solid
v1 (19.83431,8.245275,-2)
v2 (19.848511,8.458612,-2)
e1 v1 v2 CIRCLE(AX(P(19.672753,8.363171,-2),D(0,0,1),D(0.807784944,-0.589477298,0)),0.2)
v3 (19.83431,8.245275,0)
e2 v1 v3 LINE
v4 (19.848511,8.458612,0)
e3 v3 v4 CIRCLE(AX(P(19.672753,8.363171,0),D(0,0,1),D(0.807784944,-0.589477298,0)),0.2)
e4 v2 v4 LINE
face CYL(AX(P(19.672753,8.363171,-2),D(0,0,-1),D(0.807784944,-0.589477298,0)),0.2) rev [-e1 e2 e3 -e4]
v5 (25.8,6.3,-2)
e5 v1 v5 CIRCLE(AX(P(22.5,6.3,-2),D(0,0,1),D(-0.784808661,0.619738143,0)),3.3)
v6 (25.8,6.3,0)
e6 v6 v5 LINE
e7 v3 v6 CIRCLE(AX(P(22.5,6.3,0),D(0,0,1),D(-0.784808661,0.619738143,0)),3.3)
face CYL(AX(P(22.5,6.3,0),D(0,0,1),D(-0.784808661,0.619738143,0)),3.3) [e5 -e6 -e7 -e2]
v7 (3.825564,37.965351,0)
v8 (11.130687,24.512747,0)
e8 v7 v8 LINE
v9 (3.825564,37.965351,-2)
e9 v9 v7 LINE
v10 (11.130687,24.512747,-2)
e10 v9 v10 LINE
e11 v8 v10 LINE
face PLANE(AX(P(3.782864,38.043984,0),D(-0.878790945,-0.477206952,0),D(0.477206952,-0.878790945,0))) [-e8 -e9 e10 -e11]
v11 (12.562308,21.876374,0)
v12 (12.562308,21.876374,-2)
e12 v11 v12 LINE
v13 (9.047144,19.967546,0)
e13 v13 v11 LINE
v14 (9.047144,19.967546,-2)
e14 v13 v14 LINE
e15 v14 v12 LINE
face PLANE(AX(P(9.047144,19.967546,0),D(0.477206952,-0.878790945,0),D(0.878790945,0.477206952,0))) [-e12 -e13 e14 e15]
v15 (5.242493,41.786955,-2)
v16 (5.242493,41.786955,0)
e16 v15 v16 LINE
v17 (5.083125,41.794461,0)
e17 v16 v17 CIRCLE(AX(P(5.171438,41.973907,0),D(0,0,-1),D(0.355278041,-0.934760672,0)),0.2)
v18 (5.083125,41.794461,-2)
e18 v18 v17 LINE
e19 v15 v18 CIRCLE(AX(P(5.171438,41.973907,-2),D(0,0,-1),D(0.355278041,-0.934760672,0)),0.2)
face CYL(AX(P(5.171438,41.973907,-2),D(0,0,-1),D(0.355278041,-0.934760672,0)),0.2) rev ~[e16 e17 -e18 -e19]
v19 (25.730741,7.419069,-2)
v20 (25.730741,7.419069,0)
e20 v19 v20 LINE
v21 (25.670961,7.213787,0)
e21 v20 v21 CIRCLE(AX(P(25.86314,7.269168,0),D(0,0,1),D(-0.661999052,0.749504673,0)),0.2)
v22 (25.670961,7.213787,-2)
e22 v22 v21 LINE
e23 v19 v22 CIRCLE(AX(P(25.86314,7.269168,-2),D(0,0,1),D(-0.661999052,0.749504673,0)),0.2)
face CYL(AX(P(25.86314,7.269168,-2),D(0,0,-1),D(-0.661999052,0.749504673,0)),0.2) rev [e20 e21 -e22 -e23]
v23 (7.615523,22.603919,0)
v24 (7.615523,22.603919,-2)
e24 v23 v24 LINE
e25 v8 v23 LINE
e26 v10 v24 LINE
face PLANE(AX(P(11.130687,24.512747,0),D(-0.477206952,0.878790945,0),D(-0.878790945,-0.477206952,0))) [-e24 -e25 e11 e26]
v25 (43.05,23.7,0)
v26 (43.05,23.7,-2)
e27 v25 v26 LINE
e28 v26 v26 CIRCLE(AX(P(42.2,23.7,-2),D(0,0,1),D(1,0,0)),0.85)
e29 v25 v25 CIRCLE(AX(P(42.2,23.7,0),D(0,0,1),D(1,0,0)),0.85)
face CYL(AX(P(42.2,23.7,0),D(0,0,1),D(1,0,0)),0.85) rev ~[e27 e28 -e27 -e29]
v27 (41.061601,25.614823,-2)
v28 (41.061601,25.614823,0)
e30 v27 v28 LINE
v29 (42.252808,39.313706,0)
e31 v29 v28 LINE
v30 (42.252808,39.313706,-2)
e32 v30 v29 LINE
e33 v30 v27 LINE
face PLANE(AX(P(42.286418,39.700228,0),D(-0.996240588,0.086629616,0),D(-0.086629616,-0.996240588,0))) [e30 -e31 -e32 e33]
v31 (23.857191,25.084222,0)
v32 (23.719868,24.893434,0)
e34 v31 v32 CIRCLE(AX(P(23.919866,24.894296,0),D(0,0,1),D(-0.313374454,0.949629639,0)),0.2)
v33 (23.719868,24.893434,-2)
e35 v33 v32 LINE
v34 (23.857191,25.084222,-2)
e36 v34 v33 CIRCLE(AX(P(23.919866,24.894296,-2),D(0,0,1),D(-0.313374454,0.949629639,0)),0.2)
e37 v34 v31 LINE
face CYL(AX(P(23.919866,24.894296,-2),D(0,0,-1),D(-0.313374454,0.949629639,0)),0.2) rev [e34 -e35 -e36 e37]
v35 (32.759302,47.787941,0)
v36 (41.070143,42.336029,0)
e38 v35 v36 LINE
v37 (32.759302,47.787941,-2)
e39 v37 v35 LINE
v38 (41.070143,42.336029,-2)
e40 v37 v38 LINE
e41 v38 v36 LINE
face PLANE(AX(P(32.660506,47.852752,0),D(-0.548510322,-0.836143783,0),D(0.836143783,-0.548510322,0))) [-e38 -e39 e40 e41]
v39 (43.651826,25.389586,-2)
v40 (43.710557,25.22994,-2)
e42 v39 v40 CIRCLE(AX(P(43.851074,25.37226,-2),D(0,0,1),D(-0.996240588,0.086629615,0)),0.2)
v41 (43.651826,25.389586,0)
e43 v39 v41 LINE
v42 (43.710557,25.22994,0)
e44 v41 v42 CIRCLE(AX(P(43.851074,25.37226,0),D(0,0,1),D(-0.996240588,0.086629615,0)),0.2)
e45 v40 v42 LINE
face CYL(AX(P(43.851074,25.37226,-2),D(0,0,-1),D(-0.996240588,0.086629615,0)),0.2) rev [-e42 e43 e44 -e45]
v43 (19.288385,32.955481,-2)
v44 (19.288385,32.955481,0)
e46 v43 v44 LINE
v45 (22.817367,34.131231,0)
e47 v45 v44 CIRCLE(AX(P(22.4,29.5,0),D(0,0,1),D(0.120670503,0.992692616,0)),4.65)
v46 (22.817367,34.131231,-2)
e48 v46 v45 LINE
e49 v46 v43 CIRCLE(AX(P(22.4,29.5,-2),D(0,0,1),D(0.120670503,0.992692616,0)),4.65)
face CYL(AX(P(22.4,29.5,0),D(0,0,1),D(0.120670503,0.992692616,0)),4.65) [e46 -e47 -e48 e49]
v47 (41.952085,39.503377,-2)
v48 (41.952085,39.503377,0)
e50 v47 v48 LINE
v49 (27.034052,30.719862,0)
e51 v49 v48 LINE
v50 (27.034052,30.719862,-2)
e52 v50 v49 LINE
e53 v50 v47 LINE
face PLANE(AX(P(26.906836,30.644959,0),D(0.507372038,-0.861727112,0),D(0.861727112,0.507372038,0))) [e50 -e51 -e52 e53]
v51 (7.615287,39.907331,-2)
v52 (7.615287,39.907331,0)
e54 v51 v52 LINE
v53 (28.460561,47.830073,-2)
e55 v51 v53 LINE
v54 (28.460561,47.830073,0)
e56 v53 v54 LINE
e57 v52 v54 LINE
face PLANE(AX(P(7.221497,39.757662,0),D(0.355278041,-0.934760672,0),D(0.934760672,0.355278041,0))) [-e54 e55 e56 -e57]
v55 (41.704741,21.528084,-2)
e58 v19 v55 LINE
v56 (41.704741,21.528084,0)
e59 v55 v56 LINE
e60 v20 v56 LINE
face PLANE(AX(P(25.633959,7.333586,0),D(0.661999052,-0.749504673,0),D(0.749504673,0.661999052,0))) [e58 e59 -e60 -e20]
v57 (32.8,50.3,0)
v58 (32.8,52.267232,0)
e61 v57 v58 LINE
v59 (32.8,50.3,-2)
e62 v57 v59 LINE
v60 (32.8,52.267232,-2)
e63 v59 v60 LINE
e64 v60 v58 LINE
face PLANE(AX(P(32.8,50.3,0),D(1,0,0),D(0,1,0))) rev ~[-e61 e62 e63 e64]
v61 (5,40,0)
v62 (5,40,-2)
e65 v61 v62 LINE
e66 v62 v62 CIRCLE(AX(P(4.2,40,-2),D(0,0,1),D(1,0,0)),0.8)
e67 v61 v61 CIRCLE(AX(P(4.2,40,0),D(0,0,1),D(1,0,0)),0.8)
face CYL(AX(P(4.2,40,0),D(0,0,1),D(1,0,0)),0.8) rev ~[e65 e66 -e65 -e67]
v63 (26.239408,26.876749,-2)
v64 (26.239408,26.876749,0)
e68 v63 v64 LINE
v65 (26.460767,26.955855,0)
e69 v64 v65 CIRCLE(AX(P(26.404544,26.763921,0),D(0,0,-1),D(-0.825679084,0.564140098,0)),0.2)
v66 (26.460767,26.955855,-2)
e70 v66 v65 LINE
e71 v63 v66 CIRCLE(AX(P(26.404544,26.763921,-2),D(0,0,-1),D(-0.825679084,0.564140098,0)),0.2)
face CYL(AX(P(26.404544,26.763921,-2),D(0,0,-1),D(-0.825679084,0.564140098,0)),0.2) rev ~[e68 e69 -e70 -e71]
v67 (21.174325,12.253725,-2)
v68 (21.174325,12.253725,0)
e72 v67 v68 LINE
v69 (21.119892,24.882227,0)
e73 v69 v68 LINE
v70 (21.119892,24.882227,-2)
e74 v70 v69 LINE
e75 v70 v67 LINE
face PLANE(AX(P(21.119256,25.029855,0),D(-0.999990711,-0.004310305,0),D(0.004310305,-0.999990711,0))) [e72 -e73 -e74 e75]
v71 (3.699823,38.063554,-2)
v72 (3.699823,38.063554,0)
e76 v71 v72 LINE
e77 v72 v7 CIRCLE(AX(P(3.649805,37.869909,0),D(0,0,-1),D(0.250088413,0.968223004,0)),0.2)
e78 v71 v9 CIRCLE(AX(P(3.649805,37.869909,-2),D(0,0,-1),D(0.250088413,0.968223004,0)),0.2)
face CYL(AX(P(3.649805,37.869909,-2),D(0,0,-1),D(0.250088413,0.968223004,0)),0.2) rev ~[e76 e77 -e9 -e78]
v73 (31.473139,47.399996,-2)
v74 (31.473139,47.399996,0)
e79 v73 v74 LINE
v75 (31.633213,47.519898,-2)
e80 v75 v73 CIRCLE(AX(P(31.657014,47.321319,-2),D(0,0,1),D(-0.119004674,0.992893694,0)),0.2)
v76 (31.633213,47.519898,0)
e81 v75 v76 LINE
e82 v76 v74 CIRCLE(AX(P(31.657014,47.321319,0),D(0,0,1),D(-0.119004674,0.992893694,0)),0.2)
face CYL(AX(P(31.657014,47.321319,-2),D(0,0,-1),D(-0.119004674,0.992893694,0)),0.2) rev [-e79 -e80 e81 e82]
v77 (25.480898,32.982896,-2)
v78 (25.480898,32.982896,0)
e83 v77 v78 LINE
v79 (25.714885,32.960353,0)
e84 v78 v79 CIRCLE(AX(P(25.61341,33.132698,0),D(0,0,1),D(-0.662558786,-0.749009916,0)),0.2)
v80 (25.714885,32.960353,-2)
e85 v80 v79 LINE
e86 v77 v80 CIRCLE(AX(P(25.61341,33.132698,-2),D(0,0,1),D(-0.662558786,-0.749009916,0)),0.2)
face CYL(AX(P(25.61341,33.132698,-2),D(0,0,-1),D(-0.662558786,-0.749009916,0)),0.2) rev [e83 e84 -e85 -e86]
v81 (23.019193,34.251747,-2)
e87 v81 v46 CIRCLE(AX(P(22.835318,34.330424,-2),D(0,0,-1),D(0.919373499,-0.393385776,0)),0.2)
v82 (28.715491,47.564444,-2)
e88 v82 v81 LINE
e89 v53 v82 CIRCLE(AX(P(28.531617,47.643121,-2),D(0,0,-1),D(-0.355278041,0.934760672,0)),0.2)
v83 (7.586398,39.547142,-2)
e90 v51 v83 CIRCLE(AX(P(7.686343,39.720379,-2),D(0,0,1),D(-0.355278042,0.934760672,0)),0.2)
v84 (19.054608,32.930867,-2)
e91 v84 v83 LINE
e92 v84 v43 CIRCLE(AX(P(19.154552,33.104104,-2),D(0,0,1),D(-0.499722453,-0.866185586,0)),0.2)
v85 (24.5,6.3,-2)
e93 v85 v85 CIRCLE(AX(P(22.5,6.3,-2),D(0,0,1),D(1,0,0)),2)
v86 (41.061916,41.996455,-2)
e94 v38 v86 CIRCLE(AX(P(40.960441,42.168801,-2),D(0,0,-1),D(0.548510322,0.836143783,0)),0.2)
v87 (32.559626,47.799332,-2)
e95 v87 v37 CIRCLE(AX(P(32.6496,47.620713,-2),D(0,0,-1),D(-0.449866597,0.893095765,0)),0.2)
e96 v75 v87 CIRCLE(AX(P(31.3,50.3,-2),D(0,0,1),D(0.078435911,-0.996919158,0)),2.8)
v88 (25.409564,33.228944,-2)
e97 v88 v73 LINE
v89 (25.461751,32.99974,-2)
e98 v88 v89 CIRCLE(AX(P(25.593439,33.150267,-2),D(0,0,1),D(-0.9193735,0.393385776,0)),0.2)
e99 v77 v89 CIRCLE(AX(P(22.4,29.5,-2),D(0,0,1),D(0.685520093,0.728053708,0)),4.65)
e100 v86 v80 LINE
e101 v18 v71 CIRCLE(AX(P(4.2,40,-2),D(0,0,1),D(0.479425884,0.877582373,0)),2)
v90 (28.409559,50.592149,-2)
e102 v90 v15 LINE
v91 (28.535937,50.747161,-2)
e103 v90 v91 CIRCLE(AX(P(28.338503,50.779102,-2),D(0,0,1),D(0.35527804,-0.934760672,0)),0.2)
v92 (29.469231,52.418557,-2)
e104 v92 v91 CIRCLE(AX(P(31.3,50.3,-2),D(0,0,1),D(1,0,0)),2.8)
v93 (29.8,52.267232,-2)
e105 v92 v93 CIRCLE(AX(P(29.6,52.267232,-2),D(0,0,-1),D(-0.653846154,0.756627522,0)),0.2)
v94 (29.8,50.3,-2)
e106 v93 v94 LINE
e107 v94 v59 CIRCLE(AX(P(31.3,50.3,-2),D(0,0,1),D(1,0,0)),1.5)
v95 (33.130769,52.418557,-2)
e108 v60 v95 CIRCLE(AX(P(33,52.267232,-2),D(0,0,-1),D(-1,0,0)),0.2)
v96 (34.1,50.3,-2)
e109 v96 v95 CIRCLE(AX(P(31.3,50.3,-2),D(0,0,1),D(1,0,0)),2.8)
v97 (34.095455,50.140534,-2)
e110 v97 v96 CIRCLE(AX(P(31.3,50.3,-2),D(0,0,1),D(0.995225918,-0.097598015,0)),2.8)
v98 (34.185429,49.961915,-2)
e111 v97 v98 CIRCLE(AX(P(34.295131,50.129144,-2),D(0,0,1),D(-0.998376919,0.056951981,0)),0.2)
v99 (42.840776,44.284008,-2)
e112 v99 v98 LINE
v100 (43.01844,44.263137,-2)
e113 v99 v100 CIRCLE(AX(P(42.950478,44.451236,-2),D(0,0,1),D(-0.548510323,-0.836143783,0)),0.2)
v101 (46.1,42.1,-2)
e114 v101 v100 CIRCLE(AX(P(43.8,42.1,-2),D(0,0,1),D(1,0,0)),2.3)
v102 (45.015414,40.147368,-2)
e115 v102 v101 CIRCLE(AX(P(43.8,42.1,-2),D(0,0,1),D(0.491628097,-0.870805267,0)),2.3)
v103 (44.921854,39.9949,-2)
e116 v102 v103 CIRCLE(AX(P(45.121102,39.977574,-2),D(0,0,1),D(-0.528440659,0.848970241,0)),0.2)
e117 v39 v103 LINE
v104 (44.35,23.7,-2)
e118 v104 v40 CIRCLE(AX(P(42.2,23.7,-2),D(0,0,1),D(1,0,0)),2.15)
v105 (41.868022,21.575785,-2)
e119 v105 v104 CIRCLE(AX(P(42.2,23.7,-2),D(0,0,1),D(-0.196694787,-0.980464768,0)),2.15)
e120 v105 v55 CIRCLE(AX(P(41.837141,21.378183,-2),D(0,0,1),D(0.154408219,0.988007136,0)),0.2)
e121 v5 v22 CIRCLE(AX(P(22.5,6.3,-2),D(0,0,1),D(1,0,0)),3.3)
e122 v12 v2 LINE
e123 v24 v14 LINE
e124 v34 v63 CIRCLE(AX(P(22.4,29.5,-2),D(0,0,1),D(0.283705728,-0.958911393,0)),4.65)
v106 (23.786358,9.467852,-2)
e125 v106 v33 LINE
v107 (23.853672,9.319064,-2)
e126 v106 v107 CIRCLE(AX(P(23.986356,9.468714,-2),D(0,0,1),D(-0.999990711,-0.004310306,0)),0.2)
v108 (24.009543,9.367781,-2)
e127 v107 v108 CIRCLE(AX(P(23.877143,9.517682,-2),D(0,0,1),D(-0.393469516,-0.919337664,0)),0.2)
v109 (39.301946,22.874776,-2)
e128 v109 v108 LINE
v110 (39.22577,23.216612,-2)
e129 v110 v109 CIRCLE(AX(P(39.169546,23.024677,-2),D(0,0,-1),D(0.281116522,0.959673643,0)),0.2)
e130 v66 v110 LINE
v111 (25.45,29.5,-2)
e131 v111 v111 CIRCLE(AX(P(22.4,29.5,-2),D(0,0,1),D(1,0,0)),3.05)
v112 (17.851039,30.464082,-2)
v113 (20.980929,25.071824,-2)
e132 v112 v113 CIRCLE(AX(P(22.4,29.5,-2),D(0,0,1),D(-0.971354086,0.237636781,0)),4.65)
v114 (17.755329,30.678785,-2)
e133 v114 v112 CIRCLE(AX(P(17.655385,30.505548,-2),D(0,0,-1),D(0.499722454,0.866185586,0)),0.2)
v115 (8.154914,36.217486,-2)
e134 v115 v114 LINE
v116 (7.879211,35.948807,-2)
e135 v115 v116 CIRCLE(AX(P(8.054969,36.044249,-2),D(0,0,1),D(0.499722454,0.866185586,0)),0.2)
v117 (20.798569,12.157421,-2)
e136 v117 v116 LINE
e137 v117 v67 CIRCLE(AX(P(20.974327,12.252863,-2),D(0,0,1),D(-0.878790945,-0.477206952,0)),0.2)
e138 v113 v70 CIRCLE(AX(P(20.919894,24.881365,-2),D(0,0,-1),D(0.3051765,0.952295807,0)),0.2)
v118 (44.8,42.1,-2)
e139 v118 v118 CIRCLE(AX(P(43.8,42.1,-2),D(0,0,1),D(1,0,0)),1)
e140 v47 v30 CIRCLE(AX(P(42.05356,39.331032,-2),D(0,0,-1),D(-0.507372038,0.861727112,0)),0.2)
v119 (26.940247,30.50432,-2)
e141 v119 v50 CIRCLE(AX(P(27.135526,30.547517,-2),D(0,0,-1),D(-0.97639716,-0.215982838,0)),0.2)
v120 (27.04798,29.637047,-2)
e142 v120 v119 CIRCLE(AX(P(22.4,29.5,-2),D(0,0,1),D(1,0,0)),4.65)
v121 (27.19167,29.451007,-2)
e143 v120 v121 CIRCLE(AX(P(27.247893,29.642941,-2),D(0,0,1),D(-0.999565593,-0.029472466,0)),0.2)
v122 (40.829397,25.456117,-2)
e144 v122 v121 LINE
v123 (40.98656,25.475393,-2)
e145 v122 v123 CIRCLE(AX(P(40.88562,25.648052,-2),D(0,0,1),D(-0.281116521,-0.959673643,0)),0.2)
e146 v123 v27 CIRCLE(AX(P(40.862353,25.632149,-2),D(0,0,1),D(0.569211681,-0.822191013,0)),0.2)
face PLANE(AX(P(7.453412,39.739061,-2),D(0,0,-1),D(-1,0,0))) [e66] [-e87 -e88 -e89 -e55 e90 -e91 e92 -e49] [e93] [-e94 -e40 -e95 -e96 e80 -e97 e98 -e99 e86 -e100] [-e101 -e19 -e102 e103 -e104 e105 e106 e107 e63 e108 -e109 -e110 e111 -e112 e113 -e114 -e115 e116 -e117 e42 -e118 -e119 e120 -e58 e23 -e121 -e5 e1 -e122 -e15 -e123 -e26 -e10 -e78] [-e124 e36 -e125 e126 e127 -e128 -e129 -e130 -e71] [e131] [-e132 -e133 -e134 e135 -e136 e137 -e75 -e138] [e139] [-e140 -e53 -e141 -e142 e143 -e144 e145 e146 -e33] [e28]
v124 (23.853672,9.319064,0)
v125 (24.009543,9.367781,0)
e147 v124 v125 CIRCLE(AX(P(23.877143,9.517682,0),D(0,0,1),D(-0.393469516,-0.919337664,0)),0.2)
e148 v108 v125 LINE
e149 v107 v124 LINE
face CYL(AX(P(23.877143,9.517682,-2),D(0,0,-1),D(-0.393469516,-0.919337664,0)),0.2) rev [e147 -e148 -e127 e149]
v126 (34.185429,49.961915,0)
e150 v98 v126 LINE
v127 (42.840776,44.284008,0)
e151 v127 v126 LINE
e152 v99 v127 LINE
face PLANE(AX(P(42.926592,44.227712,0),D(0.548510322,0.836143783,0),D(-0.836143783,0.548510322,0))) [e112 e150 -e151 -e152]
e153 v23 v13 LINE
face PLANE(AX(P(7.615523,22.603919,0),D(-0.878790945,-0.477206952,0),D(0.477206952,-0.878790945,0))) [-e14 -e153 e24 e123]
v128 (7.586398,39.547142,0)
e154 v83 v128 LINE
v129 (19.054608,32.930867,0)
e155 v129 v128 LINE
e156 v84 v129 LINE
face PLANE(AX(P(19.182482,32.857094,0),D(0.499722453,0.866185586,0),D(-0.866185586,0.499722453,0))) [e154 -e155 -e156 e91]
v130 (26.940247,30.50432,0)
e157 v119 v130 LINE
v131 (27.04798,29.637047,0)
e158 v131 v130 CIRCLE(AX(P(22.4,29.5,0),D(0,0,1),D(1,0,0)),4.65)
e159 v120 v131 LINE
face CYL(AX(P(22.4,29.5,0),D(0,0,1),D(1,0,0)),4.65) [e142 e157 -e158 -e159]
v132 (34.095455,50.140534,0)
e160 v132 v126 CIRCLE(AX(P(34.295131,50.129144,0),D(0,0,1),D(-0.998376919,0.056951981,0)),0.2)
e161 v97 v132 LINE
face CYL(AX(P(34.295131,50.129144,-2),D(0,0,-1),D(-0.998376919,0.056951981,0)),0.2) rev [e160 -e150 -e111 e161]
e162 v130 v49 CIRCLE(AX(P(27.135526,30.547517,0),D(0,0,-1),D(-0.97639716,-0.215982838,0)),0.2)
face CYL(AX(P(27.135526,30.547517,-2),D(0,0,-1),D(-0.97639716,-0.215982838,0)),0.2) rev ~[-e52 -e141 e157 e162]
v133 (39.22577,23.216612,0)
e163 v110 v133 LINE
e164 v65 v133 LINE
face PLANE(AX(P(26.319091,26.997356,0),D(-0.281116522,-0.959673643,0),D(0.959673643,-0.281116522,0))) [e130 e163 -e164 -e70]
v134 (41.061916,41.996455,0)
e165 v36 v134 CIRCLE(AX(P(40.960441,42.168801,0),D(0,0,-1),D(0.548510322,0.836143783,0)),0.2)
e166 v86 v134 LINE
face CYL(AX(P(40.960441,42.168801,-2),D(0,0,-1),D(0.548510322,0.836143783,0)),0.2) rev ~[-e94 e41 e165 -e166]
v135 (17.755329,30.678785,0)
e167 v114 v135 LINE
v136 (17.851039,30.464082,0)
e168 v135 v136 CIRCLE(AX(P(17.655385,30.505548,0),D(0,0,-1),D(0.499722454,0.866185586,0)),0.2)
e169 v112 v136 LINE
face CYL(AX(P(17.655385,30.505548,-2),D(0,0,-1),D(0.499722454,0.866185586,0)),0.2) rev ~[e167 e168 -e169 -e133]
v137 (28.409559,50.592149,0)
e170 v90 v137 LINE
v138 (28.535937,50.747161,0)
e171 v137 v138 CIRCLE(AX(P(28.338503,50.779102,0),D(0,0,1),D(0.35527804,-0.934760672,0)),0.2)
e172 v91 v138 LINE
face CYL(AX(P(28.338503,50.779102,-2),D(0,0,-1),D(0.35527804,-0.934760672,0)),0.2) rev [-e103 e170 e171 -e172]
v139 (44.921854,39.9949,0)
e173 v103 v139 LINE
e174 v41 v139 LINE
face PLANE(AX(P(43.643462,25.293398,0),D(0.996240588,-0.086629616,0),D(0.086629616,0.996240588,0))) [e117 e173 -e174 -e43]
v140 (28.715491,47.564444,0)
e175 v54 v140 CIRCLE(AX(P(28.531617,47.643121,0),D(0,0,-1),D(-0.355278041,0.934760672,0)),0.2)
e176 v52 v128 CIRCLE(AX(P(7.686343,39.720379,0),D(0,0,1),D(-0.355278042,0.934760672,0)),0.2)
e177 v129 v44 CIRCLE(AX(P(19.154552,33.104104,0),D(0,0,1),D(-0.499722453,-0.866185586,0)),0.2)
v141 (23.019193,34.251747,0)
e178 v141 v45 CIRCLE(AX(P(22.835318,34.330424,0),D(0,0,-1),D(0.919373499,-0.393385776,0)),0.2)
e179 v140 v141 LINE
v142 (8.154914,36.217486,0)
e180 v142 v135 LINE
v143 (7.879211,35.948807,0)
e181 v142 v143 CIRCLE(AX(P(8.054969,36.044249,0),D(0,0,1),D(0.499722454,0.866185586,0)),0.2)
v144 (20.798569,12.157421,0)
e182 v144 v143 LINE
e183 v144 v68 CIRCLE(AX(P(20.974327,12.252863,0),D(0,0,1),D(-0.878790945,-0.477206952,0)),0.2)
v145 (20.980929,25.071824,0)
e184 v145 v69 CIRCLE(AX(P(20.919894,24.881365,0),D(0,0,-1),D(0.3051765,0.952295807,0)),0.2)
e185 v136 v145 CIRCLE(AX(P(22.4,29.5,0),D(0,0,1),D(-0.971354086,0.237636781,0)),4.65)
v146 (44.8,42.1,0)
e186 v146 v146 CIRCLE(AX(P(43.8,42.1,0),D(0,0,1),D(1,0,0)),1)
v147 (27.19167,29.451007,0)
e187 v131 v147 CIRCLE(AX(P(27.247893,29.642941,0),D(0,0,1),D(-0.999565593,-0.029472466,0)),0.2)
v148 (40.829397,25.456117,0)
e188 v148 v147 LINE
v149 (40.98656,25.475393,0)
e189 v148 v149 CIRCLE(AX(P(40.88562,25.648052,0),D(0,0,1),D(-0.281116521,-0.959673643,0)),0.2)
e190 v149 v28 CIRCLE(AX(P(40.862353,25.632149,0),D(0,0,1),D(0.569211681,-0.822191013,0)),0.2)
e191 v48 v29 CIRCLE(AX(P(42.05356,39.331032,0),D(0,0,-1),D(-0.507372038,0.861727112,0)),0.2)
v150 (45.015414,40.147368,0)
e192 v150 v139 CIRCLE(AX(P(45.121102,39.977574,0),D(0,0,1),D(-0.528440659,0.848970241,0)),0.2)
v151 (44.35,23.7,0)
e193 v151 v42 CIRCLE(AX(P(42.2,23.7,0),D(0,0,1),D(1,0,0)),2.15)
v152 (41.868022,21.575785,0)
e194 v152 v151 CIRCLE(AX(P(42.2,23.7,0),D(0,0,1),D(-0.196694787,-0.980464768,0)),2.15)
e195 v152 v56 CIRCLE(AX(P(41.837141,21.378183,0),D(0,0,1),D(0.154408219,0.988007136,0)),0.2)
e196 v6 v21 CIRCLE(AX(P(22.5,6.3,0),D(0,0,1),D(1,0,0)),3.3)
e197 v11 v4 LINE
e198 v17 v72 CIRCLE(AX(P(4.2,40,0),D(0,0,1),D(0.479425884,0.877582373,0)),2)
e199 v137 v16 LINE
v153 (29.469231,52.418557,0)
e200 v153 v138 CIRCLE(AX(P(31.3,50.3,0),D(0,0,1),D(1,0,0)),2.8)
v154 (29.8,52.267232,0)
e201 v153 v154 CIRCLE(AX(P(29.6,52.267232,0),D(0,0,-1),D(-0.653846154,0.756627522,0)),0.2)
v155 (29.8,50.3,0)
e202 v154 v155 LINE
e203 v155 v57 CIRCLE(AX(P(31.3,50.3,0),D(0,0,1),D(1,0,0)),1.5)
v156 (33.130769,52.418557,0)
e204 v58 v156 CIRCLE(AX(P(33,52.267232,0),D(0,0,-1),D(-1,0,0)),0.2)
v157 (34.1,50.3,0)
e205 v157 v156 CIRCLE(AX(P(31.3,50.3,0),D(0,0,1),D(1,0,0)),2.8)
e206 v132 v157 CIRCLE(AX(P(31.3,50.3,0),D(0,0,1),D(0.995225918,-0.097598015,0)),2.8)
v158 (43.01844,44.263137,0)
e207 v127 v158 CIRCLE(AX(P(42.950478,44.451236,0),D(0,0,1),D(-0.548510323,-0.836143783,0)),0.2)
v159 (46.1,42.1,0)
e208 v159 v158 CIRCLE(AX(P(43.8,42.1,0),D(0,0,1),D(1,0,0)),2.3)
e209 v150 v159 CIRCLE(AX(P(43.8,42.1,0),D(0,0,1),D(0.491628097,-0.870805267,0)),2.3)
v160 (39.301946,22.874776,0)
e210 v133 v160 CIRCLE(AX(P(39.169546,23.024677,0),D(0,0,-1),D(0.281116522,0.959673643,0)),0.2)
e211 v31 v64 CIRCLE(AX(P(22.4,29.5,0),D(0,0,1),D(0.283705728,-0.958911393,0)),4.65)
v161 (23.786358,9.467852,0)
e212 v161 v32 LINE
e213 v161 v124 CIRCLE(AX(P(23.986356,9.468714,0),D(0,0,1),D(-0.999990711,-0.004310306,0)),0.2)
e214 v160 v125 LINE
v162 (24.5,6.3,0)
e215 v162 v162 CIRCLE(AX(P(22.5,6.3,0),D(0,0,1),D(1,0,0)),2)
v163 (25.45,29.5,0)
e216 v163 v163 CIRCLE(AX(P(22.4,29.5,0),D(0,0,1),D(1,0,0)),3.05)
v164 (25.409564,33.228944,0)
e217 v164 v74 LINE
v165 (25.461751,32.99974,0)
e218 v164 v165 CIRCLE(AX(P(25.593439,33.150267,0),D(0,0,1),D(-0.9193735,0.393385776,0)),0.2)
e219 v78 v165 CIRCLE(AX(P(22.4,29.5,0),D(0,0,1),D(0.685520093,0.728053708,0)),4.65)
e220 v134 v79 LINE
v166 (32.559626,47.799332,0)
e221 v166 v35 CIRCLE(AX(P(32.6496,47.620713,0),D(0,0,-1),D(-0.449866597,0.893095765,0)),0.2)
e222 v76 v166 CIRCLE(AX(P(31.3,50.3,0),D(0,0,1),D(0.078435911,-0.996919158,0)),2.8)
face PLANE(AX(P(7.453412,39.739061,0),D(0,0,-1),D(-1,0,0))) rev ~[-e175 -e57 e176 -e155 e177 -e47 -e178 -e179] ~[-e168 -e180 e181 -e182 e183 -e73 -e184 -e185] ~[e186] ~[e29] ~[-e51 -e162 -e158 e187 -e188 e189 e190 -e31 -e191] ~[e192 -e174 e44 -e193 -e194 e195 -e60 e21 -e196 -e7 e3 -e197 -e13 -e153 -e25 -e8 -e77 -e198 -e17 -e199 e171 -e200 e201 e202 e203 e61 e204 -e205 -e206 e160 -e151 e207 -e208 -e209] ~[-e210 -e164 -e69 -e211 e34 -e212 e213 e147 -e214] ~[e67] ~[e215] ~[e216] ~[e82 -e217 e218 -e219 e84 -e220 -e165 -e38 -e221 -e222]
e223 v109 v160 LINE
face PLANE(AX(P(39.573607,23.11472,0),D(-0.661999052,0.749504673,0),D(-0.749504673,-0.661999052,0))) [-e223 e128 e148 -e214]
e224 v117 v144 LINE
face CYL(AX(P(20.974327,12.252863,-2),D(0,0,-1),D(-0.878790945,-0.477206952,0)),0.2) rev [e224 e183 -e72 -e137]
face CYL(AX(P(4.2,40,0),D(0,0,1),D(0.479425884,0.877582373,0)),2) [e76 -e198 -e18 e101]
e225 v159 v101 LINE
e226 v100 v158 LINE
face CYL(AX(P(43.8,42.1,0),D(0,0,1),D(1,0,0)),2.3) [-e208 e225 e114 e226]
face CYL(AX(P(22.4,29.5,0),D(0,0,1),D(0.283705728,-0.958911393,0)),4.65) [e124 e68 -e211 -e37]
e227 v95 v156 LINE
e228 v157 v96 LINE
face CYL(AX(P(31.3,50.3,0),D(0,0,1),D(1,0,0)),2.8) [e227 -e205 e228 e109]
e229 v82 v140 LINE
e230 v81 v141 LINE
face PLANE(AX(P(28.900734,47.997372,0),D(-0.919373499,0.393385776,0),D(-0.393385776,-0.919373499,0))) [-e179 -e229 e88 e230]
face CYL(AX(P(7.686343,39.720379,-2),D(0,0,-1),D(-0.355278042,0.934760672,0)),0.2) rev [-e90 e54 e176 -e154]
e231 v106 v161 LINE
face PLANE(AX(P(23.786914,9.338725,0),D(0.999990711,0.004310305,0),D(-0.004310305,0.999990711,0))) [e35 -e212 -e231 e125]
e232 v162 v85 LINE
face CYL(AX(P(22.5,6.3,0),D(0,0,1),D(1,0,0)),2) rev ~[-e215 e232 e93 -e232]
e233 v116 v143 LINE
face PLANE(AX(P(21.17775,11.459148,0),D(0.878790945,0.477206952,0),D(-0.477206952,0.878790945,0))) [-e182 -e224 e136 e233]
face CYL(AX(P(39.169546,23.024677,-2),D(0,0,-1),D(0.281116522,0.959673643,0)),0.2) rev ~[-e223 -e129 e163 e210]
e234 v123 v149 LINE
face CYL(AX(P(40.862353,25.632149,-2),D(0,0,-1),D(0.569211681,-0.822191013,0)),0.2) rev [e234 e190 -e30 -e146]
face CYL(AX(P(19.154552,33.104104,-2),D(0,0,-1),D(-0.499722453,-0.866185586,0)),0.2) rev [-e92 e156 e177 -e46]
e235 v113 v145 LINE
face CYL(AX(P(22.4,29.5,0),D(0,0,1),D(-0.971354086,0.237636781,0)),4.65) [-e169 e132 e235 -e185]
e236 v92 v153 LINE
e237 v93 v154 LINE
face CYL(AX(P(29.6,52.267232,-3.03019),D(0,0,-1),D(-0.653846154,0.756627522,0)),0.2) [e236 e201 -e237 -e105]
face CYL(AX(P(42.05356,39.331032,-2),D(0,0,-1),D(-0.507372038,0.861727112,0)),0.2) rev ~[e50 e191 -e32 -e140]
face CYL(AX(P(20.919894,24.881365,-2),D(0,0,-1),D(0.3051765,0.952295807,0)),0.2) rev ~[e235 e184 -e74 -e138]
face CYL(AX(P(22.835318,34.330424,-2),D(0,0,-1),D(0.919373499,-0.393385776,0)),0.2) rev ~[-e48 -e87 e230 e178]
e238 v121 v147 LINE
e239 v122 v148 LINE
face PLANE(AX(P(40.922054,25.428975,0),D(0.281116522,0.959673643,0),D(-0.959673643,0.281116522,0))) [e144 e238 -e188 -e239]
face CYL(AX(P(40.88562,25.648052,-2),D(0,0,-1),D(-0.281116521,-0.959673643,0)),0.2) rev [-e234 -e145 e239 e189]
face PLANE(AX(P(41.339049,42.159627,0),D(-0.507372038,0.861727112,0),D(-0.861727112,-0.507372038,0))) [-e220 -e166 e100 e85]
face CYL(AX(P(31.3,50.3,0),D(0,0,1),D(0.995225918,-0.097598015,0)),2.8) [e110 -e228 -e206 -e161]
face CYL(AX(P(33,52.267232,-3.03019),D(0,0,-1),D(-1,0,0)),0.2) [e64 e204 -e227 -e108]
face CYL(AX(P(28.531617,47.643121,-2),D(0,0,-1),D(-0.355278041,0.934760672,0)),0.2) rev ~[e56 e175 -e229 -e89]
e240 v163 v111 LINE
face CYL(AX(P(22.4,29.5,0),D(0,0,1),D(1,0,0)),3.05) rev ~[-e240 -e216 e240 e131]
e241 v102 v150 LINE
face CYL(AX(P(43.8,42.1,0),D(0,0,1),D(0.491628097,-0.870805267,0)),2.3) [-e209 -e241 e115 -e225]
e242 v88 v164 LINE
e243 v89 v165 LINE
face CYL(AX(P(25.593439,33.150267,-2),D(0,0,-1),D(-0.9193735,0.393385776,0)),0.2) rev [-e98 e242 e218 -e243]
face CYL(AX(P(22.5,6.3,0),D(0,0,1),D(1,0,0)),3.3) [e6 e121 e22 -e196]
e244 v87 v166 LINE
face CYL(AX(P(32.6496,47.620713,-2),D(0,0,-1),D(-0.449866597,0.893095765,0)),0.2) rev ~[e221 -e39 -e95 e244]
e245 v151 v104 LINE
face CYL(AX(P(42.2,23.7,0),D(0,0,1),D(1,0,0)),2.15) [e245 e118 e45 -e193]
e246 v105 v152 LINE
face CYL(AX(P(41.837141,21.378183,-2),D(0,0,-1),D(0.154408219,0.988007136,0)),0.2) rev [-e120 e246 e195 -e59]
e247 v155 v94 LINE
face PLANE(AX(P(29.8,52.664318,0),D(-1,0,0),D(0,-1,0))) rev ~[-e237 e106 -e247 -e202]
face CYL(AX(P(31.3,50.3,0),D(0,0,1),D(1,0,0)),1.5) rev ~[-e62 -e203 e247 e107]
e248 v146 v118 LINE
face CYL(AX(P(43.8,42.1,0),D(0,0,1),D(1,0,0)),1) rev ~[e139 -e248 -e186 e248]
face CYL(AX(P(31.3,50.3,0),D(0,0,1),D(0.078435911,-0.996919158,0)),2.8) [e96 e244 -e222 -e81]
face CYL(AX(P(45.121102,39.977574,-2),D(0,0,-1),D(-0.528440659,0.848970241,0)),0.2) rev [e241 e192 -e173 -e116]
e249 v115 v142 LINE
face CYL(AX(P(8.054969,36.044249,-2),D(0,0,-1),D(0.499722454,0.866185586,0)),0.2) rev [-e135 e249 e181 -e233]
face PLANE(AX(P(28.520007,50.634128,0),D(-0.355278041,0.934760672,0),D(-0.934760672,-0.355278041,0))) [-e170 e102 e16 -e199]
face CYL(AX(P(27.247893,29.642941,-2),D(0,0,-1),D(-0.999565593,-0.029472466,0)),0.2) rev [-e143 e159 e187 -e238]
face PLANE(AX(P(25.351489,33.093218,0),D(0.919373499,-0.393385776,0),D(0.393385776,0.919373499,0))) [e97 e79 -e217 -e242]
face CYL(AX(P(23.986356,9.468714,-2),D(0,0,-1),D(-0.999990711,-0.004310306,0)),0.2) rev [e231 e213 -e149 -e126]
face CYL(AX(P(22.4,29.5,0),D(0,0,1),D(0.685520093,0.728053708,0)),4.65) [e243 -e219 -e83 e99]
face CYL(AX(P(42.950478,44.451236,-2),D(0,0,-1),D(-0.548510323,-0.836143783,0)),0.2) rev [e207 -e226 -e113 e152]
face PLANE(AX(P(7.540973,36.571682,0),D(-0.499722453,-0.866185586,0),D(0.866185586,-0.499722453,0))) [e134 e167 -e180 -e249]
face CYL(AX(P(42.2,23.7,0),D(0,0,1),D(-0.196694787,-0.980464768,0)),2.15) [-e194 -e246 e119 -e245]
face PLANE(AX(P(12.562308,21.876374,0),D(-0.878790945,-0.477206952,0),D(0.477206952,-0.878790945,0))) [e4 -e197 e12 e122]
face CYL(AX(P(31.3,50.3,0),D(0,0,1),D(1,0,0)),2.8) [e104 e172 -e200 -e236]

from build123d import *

# Parameters (mm, degrees)
F1_R        = 0.8
F1_R_2      = 1.5
F1_R_3      = 1
F1_R_4      = 0.85
F1_R_5      = 2
F1_R_6      = 3.05
F2_DEPTH    = 2
F4_DEPTH    = 2.001
F5_T1_DEPTH = 2
F5_T3_DEPTH = 4.0603808135


# Not quite as in the source:
# - a fillet or chamfer that OpenCascade refuses, or shapes differently, is made with other operations: its cross-section is extruded or revolved along the edge and cut away or added


with BuildPart() as f2:
    # F1 (on Top) → F2 (new body)
    with BuildSketch(Plane.XY):
        with BuildLine():
            ThreePointArc((5.1588517672, 41.7551647468), (5.8189357702, 41.1743283067), (6.1661273036, 40.3665288884))
            Line((6.1661273036, 40.3665288884), (7.2214972283, 39.7576616241))
            Line((7.2214972283, 39.7576616241), (28.9007343827, 47.9973716865))
            Line((28.9007343827, 47.9973716865), (29.1292494513, 48.531429375))
            ThreePointArc((29.1292494513, 48.531429375), (28.6106135221, 49.5207693713), (28.5200074656, 50.6341279828))
            Line((28.5200074656, 50.6341279828), (5.1588517672, 41.7551647468))
        make_face()
        with BuildLine():
            Line((42.9265921342, 44.2277120811), (34.0866325696, 50.0267255555))
            ThreePointArc((34.0866325696, 50.0267255555), (33.6412025938, 48.7641710985), (32.6605057325, 47.8527517184))
            Line((32.6605057325, 47.8527517184), (41.3390492003, 42.1596272035))
            Line((41.3390492003, 42.1596272035), (41.5054041139, 42.257574489))
            ThreePointArc((41.5054041139, 42.257574489), (41.9346789885, 43.4455770228), (42.9265921342, 44.2277120811))
        make_face()
        with BuildLine():
            Line((43.6434620305, 25.2933980565), (44.9307446243, 40.097147885))
            ThreePointArc((44.9307446243, 40.097147885), (43.8873688977, 39.8016600174), (42.8245714122, 40.0170839983))
            Line((42.8245714122, 40.0170839983), (42.2864184602, 39.7002275873))
            Line((42.2864184602, 39.7002275873), (41.0532365012, 25.518635059))
            ThreePointArc((41.0532365012, 25.518635059), (42.3862536752, 25.8419172646), (43.6434620305, 25.2933980565))
        make_face()
        with BuildLine():
            Line((39.5736067493, 23.1147203388), (23.9127614663, 9.2822986167))
            ThreePointArc((23.9127614663, 9.2822986167), (24.9733654225, 8.4845968706), (25.6339590007, 7.3335864657))
            Line((25.6339590007, 7.3335864657), (41.7771062071, 21.5920007495))
            ThreePointArc((41.7771062071, 21.5920007495), (40.8113081392, 22.0586484485), (40.1911511893, 22.9338234826))
            Line((40.1911511893, 22.9338234826), (39.5736067493, 23.1147203388))
        make_face()
        with BuildLine():
            ThreePointArc((6.0825746745, 39.3247870004), (6.1704249985, 39.6573262113), (6.2, 40))
            ThreePointArc((6.2, 40), (6.1915138221, 40.184045365), (6.1661273036, 40.3665288884))
            ThreePointArc((6.1661273036, 40.3665288884), (5.8189357702, 41.1743283067), (5.1588517672, 41.7551647468))
            ThreePointArc((5.1588517672, 41.7551647468), (2.3247456616, 40.6952849534), (3.782863546, 38.0439843613))
            ThreePointArc((3.782863546, 38.0439843613), (4.3297316575, 38.004212011), (4.8668489245, 38.1144463646))
            ThreePointArc((4.8668489245, 38.1144463646), (5.5958497172, 38.5676580133), (6.0677200026, 39.2847224372))
            ThreePointArc((6.0677200026, 39.2847224372), (6.0752543384, 39.3047150466), (6.0825746745, 39.3247870004))
        make_face()
        with Locations((4.2, 40)):
            Circle(F1_R, mode=Mode.SUBTRACT)
        with BuildLine():
            ThreePointArc((34.1, 50.3), (31.4673632334, 53.094993658), (28.5200074656, 50.6341279828))
            ThreePointArc((28.5200074656, 50.6341279828), (28.6106135221, 49.5207693713), (29.1292494513, 48.531429375))
            ThreePointArc((29.1292494513, 48.531429375), (29.2798350863, 48.3612030221), (29.443730373, 48.2037502363))
            ThreePointArc((29.443730373, 48.2037502363), (30.4109250017, 47.6449019515), (31.5196205494, 47.5086263571))
            ThreePointArc((31.5196205494, 47.5086263571), (32.1085822981, 47.6192921332), (32.6605057325, 47.8527517184))
            ThreePointArc((32.6605057325, 47.8527517184), (33.6412025938, 48.7641710985), (34.0866325696, 50.0267255555))
            ThreePointArc((34.0866325696, 50.0267255555), (34.0966561457, 50.1631994059), (34.1, 50.3))
        make_face()
        with Locations((31.3, 50.3)):
            Circle(F1_R_2, mode=Mode.SUBTRACT)
        with BuildLine():
            ThreePointArc((46.1, 42.1), (45.080851652, 44.0103452687), (42.9265921342, 44.2277120811))
            ThreePointArc((42.9265921342, 44.2277120811), (41.9346789885, 43.4455770228), (41.5054041139, 42.257574489))
            ThreePointArc((41.5054041139, 42.257574489), (41.5006748227, 42.155711122), (41.5004652971, 42.053738244))
            ThreePointArc((41.5004652971, 42.053738244), (41.730713723, 41.0959809246), (42.340519095, 40.3223848876))
            ThreePointArc((42.340519095, 40.3223848876), (42.5730125438, 40.1546204015), (42.8245714122, 40.0170839983))
            ThreePointArc((42.8245714122, 40.0170839983), (43.8873688977, 39.8016600174), (44.9307446243, 40.097147885))
            ThreePointArc((44.9307446243, 40.097147885), (45.7862921029, 40.9404122793), (46.1, 42.1))
        make_face()
        with Locations((43.8, 42.1)):
            Circle(F1_R_3, mode=Mode.SUBTRACT)
        with BuildLine():
            ThreePointArc((40.1911511893, 22.9338234826), (40.8113081392, 22.0586484485), (41.7771062071, 21.5920007495))
            ThreePointArc((41.7771062071, 21.5920007495), (43.5625854735, 22.0369122611), (44.35, 23.7))
            ThreePointArc((44.35, 23.7), (44.1654443983, 24.5715092181), (43.6434620305, 25.2933980565))
            ThreePointArc((43.6434620305, 25.2933980565), (42.3862536752, 25.8419172646), (41.0532365012, 25.518635059))
            ThreePointArc((41.0532365012, 25.518635059), (40.9868167512, 25.475017297), (40.9220541458, 25.4289749546))
            ThreePointArc((40.9220541458, 25.4289749546), (40.2457819942, 24.5963994566), (40.0559086727, 23.5407129006))
            ThreePointArc((40.0559086727, 23.5407129006), (40.1014751279, 23.2323533801), (40.1911511893, 22.9338234826))
        make_face()
        with Locations((42.2, 23.7)):
            Circle(F1_R_4, mode=Mode.SUBTRACT)
        with BuildLine():
            ThreePointArc((22.1949878763, 9.5858739483), (21.6807151801, 9.4966814642), (21.1869382745, 9.3275186052))
            ThreePointArc((21.1869382745, 9.3275186052), (20.4876667271, 8.9154377834), (19.9101314198, 8.3451358725))
            ThreePointArc((19.9101314198, 8.3451358725), (21.4175412975, 3.1825838973), (25.8, 6.3))
            ThreePointArc((25.8, 6.3), (25.7582253377, 6.8234191904), (25.6339590007, 7.3335864657))
            ThreePointArc((25.6339590007, 7.3335864657), (24.9733654225, 8.4845968706), (23.9127614663, 9.2822986167))
            ThreePointArc((23.9127614663, 9.2822986167), (23.8501326105, 9.3111695293), (23.786914122, 9.3387253977))
            ThreePointArc((23.786914122, 9.3387253977), (23.0062642444, 9.5609349142), (22.1949878763, 9.5858739483))
        make_face()
        with Locations((22.5, 6.3)):
            Circle(F1_R_5, mode=Mode.SUBTRACT)
        with BuildLine():
            Line((7.2214972283, 39.7576616241), (6.0825746745, 39.3247870004))
            ThreePointArc((6.0825746745, 39.3247870004), (6.0752543384, 39.3047150466), (6.0677200026, 39.2847224372))
            Line((6.0677200026, 39.2847224372), (7.5409732288, 36.5716823429))
            Line((7.5409732288, 36.5716823429), (17.8832035005, 30.6050110324))
            ThreePointArc((17.8832035005, 30.6050110324), (18.3722370249, 31.8237094087), (19.1824818795, 32.8570935561))
            Line((19.1824818795, 32.8570935561), (7.2214972283, 39.7576616241))
        make_face()
        with BuildLine():
            ThreePointArc((6.1661273036, 40.3665288884), (6.1915138221, 40.184045365), (6.2, 40))
            ThreePointArc((6.2, 40), (6.1704249985, 39.6573262113), (6.0825746745, 39.3247870004))
            Line((6.0825746745, 39.3247870004), (7.2214972283, 39.7576616241))
            Line((7.2214972283, 39.7576616241), (6.1661273036, 40.3665288884))
        make_face()
        with BuildLine():
            Line((7.5409732288, 36.5716823429), (6.0677200026, 39.2847224372))
            ThreePointArc((6.0677200026, 39.2847224372), (5.5958497172, 38.5676580133), (4.8668489245, 38.1144463646))
            Line((4.8668489245, 38.1144463646), (7.5409732288, 36.5716823429))
        make_face()
        with BuildLine():
            ThreePointArc((4.8668489245, 38.1144463646), (4.3297316575, 38.004212011), (3.782863546, 38.0439843613))
            Line((3.782863546, 38.0439843613), (11.1306870545, 24.5127465342))
            Line((11.1306870545, 24.5127465342), (12.5623079112, 21.8763736997))
            Line((12.5623079112, 21.8763736997), (19.9101314198, 8.3451358725))
            ThreePointArc((19.9101314198, 8.3451358725), (20.4876667271, 8.9154377834), (21.1869382745, 9.3275186052))
            Line((21.1869382745, 9.3275186052), (21.1777502182, 11.4591476685))
            Line((21.1777502182, 11.4591476685), (7.5409732288, 36.5716823429))
            Line((7.5409732288, 36.5716823429), (4.8668489245, 38.1144463646))
        make_face()
        with BuildLine():
            Line((22.1949878763, 9.5858739483), (21.1777502182, 11.4591476685))
            Line((21.1777502182, 11.4591476685), (21.1869382745, 9.3275186052))
            ThreePointArc((21.1869382745, 9.3275186052), (21.6807151801, 9.4966814642), (22.1949878763, 9.5858739483))
        make_face()
        with BuildLine():
            Line((21.119255789, 25.0298552298), (21.1777502182, 11.4591476685))
            Line((21.1777502182, 11.4591476685), (22.1949878763, 9.5858739483))
            ThreePointArc((22.1949878763, 9.5858739483), (23.0062642444, 9.5609349142), (23.786914122, 9.3387253977))
            Line((23.786914122, 9.3387253977), (23.7192316366, 25.0410620223))
            ThreePointArc((23.7192316366, 25.0410620223), (22.4200429173, 24.8500431957), (21.119255789, 25.0298552298))
        make_face()
        with BuildLine():
            Line((40.0559086727, 23.5407129006), (39.5736067493, 23.1147203388))
            Line((39.5736067493, 23.1147203388), (40.1911511893, 22.9338234826))
            ThreePointArc((40.1911511893, 22.9338234826), (40.1014751279, 23.2323533801), (40.0559086727, 23.5407129006))
        make_face()
        with BuildLine():
            ThreePointArc((27.0499939641, 29.4925077351), (26.8624824403, 28.192808174), (26.3190910076, 26.9973562631))
            Line((26.3190910076, 26.9973562631), (39.5736067493, 23.1147203388))
            Line((39.5736067493, 23.1147203388), (40.0559086727, 23.5407129006))
            ThreePointArc((40.0559086727, 23.5407129006), (40.2457819942, 24.5963994566), (40.9220541458, 25.4289749546))
            Line((40.9220541458, 25.4289749546), (27.0499939641, 29.4925077351))
        make_face()
        with BuildLine():
            Line((29.1292494513, 48.531429375), (28.9007343827, 47.9973716865))
            Line((28.9007343827, 47.9973716865), (29.443730373, 48.2037502363))
            ThreePointArc((29.443730373, 48.2037502363), (29.2798350863, 48.3612030221), (29.1292494513, 48.531429375))
        make_face()
        with BuildLine():
            Line((29.443730373, 48.2037502363), (28.9007343827, 47.9973716865))
            Line((28.9007343827, 47.9973716865), (22.9611178394, 34.116020664))
            ThreePointArc((22.9611178394, 34.116020664), (24.229243859, 33.7750867716), (25.3514889375, 33.0932176461))
            Line((25.3514889375, 33.0932176461), (31.5196205494, 47.5086263571))
            ThreePointArc((31.5196205494, 47.5086263571), (30.4109250017, 47.6449019515), (29.443730373, 48.2037502363))
        make_face()
        with BuildLine():
            ThreePointArc((22.9611178394, 34.116020664), (20.9301904957, 33.9115938187), (19.1824818795, 32.8570935561))
            ThreePointArc((19.1824818795, 32.8570935561), (18.3722370249, 31.8237094087), (17.8832035005, 30.6050110324))
            ThreePointArc((17.8832035005, 30.6050110324), (18.378375934, 27.1656821399), (21.119255789, 25.0298552298))
            ThreePointArc((21.119255789, 25.0298552298), (22.4200429173, 24.8500431957), (23.7192316366, 25.0410620223))
            ThreePointArc((23.7192316366, 25.0410620223), (25.1958501069, 25.7843947761), (26.3190910076, 26.9973562631))
            ThreePointArc((26.3190910076, 26.9973562631), (26.8624824403, 28.192808174), (27.0499939641, 29.4925077351))
            ThreePointArc((27.0499939641, 29.4925077351), (27.049998491, 29.4962538663), (27.05, 29.5))
            ThreePointArc((27.05, 29.5), (27.0140701204, 30.0769375391), (26.9068357316, 30.6449592518))
            ThreePointArc((26.9068357316, 30.6449592518), (26.40703107, 31.8592799758), (25.5876684333, 32.8854497425))
            ThreePointArc((25.5876684333, 32.8854497425), (25.471336058, 32.991331382), (25.3514889375, 33.0932176461))
            ThreePointArc((25.3514889375, 33.0932176461), (24.229243859, 33.7750867716), (22.9611178394, 34.116020664))
        make_face()
        with Locations((22.4, 29.5)):
            Circle(F1_R_6, mode=Mode.SUBTRACT)
        with BuildLine():
            Line((41.5054041139, 42.257574489), (41.3390492003, 42.1596272035))
            Line((41.3390492003, 42.1596272035), (41.5004652971, 42.053738244))
            ThreePointArc((41.5004652971, 42.053738244), (41.5006748227, 42.155711122), (41.5054041139, 42.257574489))
        make_face()
        with BuildLine():
            Line((42.340519095, 40.3223848876), (42.2864184602, 39.7002275873))
            Line((42.2864184602, 39.7002275873), (42.8245714122, 40.0170839983))
            ThreePointArc((42.8245714122, 40.0170839983), (42.5730125438, 40.1546204015), (42.340519095, 40.3223848876))
        make_face()
        with BuildLine():
            Line((41.3390492003, 42.1596272035), (25.5876684333, 32.8854497425))
            ThreePointArc((25.5876684333, 32.8854497425), (26.40703107, 31.8592799758), (26.9068357316, 30.6449592518))
            Line((26.9068357316, 30.6449592518), (42.2864184602, 39.7002275873))
            Line((42.2864184602, 39.7002275873), (42.340519095, 40.3223848876))
            ThreePointArc((42.340519095, 40.3223848876), (41.730713723, 41.0959809246), (41.5004652971, 42.053738244))
            Line((41.5004652971, 42.053738244), (41.3390492003, 42.1596272035))
        make_face()
        Polygon((12.5623079112, 21.8763736997), (11.1306870545, 24.5127465342), (7.6155232752, 22.6039187252), (9.0471441319, 19.9675458907), align=None)
    extrude(amount=-F2_DEPTH)

    # F3 (on face) → F4 (cut, through all)
    with BuildSketch(Plane.XY):
        with BuildLine():
            Line((29.8, 52.6643180835), (29.8, 50.3))
            ThreePointArc((29.8, 50.3), (31.3, 51.8), (32.8, 50.3))
            Line((32.8, 50.3), (32.8, 52.6643180835))
            ThreePointArc((32.8, 52.6643180835), (31.3, 53.1), (29.8, 52.6643180835))
        make_face()
    extrude(amount=-F4_DEPTH, mode=Mode.SUBTRACT)

    # F5: fillet of radius 0.2 on 35 edges, made by hand

    # F5_s2 → F5_t1 (join)
    with BuildSketch(Plane.XY.offset(-2)):
        with BuildLine():
            ThreePointArc((7.6152873474, 39.9073309314), (7.4869831486, 39.736368397), (7.586398465, 39.5471416799))
            Line((7.586398465, 39.5471416799), (7.2214972283, 39.7576616241))
            Line((7.2214972283, 39.7576616241), (7.6152873474, 39.9073309314))
        make_face()
        with BuildLine():
            ThreePointArc((8.1549136009, 36.2174859744), (7.9153841385, 36.1874830559), (7.8792109212, 35.9488074668))
            Line((7.8792109212, 35.9488074668), (7.5409732288, 36.5716823429))
            Line((7.5409732288, 36.5716823429), (8.1549136009, 36.2174859744))
        make_face()
        with BuildLine():
            ThreePointArc((20.7985689859, 12.157421304), (21.0239808003, 12.0591244239), (21.174325317, 12.2537247554))
            Line((21.174325317, 12.2537247554), (21.1777502182, 11.4591476685))
            Line((21.1777502182, 11.4591476685), (20.7985689859, 12.157421304))
        make_face()
        with BuildLine():
            ThreePointArc((19.8343096871, 8.2452750848), (19.8723110487, 8.349886538), (19.8485108874, 8.4586119349))
            Line((19.8485108874, 8.4586119349), (19.9101314198, 8.3451358725))
            ThreePointArc((19.9101314198, 8.3451358725), (19.8717462329, 8.295565618), (19.8343096871, 8.2452750848))
        make_face()
        with BuildLine():
            ThreePointArc((25.7307406523, 7.4190687367), (25.6711167797, 7.3250865393), (25.6709610076, 7.2137867848))
            ThreePointArc((25.6709610076, 7.2137867848), (25.6530290307, 7.273862378), (25.6339590007, 7.3335864657))
            Line((25.6339590007, 7.3335864657), (25.7307406523, 7.4190687367))
        make_face()
        with BuildLine():
            ThreePointArc((20.9809292738, 25.0718244983), (21.0812054105, 24.9995965527), (21.1198921159, 24.8822273979))
            Line((21.1198921159, 24.8822273979), (21.119255789, 25.0298552298))
            ThreePointArc((21.119255789, 25.0298552298), (21.0499294357, 25.0503023168), (20.9809292738, 25.0718244983))
        make_face()
        with BuildLine():
            ThreePointArc((17.7553292124, 30.6787846601), (17.8380565482, 30.5869785186), (17.85103896, 30.4640816648))
            ThreePointArc((17.85103896, 30.4640816648), (17.8665735681, 30.5346713424), (17.8832035005, 30.6050110324))
            Line((17.8832035005, 30.6050110324), (17.7553292124, 30.6787846601))
        make_face()
        with BuildLine():
            ThreePointArc((3.6998231735, 38.0635539919), (3.77290973, 38.0275334575), (3.8255636798, 37.9653507815))
            Line((3.8255636798, 37.9653507815), (3.782863546, 38.0439843613))
            ThreePointArc((3.782863546, 38.0439843613), (3.7412389988, 38.0533263387), (3.6998231735, 38.0635539919))
        make_face()
        with BuildLine():
            ThreePointArc((5.2424934778, 41.7869547697), (5.1620285352, 41.7741283656), (5.0831253359, 41.7944608218))
            ThreePointArc((5.0831253359, 41.7944608218), (5.1211981098, 41.7752166185), (5.1588517672, 41.7551647468))
            Line((5.1588517672, 41.7551647468), (5.2424934778, 41.7869547697))
        make_face()
        with BuildLine():
            ThreePointArc((28.4095590818, 50.5921494458), (28.4935155026, 50.6527240866), (28.5359365753, 50.7471614748))
            ThreePointArc((28.5359365753, 50.7471614748), (28.5273959421, 50.6907259119), (28.5200074656, 50.6341279828))
            Line((28.5200074656, 50.6341279828), (28.4095590818, 50.5921494458))
        make_face()
        with BuildLine():
            ThreePointArc((28.4605609872, 47.8300733111), (28.6759140893, 47.7816066752), (28.7154912953, 47.5644440215))
            Line((28.7154912953, 47.5644440215), (28.9007343827, 47.9973716865))
            Line((28.9007343827, 47.9973716865), (28.4605609872, 47.8300733111))
        make_face()
        with BuildLine():
            ThreePointArc((34.0954553724, 50.1405344523), (34.1165116032, 50.0391707367), (34.1854286918, 49.9619152993))
            Line((34.1854286918, 49.9619152993), (34.0866325696, 50.0267255555))
            ThreePointArc((34.0866325696, 50.0267255555), (34.0916240012, 50.0835850382), (34.0954553724, 50.1405344523))
        make_face()
        with BuildLine():
            ThreePointArc((42.8407758516, 44.2840075625), (42.9271443802, 44.2526021174), (43.0184396827, 44.2631374137))
            ThreePointArc((43.0184396827, 44.2631374137), (42.9723263564, 44.2459162005), (42.9265921342, 44.2277120811))
            Line((42.9265921342, 44.2277120811), (42.8407758516, 44.2840075625))
        make_face()
        with BuildLine():
            ThreePointArc((45.0154135176, 40.1473684471), (44.9506371038, 40.082177643), (44.9218535319, 39.9949003223))
            Line((44.9218535319, 39.9949003223), (44.9307446243, 40.097147885))
            ThreePointArc((44.9307446243, 40.097147885), (44.9733477886, 40.1218051241), (45.0154135176, 40.1473684471))
        make_face()
        with BuildLine():
            ThreePointArc((41.9520853542, 39.5033772539), (42.1602543232, 39.5001952749), (42.2528078794, 39.3137059082))
            Line((42.2528078794, 39.3137059082), (42.2864184602, 39.7002275873))
            Line((42.2864184602, 39.7002275873), (41.9520853542, 39.5033772539))
        make_face()
        with BuildLine():
            ThreePointArc((41.0701434494, 42.3360293761), (41.1603827047, 42.163956174), (41.0619157925, 41.996455197))
            Line((41.0619157925, 41.996455197), (41.3390492003, 42.1596272035))
            Line((41.3390492003, 42.1596272035), (41.0701434494, 42.3360293761))
        make_face()
        with BuildLine():
            ThreePointArc((43.6518261956, 25.3895859545), (43.6633730003, 25.3032077532), (43.7105573504, 25.2299400286))
            ThreePointArc((43.7105573504, 25.2299400286), (43.6773504513, 25.2620293352), (43.6434620305, 25.2933980565))
            Line((43.6434620305, 25.2933980565), (43.6518261956, 25.3895859545))
        make_face()
        with BuildLine():
            ThreePointArc((41.8680223308, 21.5757846561), (41.7810575454, 21.5701589596), (41.7047408769, 21.5280841635))
            Line((41.7047408769, 21.5280841635), (41.7771062071, 21.5920007495))
            ThreePointArc((41.7771062071, 21.5920007495), (41.8224771908, 21.5834044958), (41.8680223308, 21.5757846561))
        make_face()
        with BuildLine():
            ThreePointArc((39.2257695535, 23.2166120426), (39.3647578651, 23.0681793251), (39.3019460595, 22.8747763793))
            Line((39.3019460595, 22.8747763793), (39.5736067493, 23.1147203388))
            Line((39.5736067493, 23.1147203388), (39.2257695535, 23.2166120426))
        make_face()
        with BuildLine():
            ThreePointArc((23.0191930682, 34.2517470413), (22.9378544501, 34.1587082918), (22.8173670954, 34.1312314461))
            ThreePointArc((22.8173670954, 34.1312314461), (22.8893015776, 34.1241846812), (22.9611178394, 34.116020664))
            Line((22.9611178394, 34.116020664), (23.0191930682, 34.2517470413))
        make_face()
        with BuildLine():
            ThreePointArc((19.0546075915, 32.9308671838), (19.1754941828, 32.905203752), (19.288384986, 32.9554814433))
            ThreePointArc((19.288384986, 32.9554814433), (19.2350510901, 32.9066990471), (19.1824818795, 32.8570935561))
            Line((19.1824818795, 32.8570935561), (19.0546075915, 32.9308671838))
        make_face()
        with BuildLine():
            ThreePointArc((23.8571912146, 25.084222179), (23.7575414471, 25.0111324839), (23.7198679635, 24.8934341903))
            Line((23.7198679635, 24.8934341903), (23.7192316366, 25.0410620223))
            ThreePointArc((23.7192316366, 25.0410620223), (23.7883791492, 25.0621059794), (23.8571912146, 25.084222179))
        make_face()
        with BuildLine():
            ThreePointArc((26.2394077419, 26.8767485459), (26.3372386428, 26.9522554628), (26.4607668631, 26.9558552549))
            Line((26.4607668631, 26.9558552549), (26.3190910076, 26.9973562631))
            ThreePointArc((26.3190910076, 26.9973562631), (26.2797180654, 26.9367427493), (26.2394077419, 26.8767485459))
        make_face()
        with BuildLine():
            ThreePointArc((23.7863575432, 9.4678516807), (23.8177871956, 9.3610816635), (23.9014210748, 9.287644385))
            ThreePointArc((23.9014210748, 9.287644385), (23.8444102239, 9.3137287784), (23.786914122, 9.3387253977))
            Line((23.786914122, 9.3387253977), (23.7863575432, 9.4678516807))
        make_face()
        with BuildLine():
            ThreePointArc((23.7984494043, 9.3338142897), (23.9089161507, 9.3202217342), (24.0095431179, 9.3677808877))
            Line((24.0095431179, 9.3677808877), (23.9127614663, 9.2822986167))
            ThreePointArc((23.9127614663, 9.2822986167), (23.8558501253, 9.3085994146), (23.7984494043, 9.3338142897))
        make_face()
        with BuildLine():
            ThreePointArc((27.0479800053, 29.6370469625), (27.0896079095, 29.5206884764), (27.1916698195, 29.4510067269))
            Line((27.1916698195, 29.4510067269), (27.0499939641, 29.4925077351))
            ThreePointArc((27.0499939641, 29.4925077351), (27.049548675, 29.5647851752), (27.0479800053, 29.6370469625))
        make_face()
        with BuildLine():
            ThreePointArc((26.9402467942, 30.5043201917), (26.9521405733, 30.6273271741), (27.0340518186, 30.7198621815))
            Line((27.0340518186, 30.7198621815), (26.9068357316, 30.6449592518))
            ThreePointArc((26.9068357316, 30.6449592518), (26.9240877968, 30.5747695596), (26.9402467942, 30.5043201917))
        make_face()
        with BuildLine():
            ThreePointArc((40.8293968182, 25.4561170001), (40.9163574726, 25.4504278048), (40.9974822397, 25.4822600922))
            ThreePointArc((40.9974822397, 25.4822600922), (40.9594820589, 25.4560225619), (40.9220541458, 25.4289749546))
            Line((40.9220541458, 25.4289749546), (40.8293968182, 25.4561170001))
        make_face()
        with BuildLine():
            ThreePointArc((40.9761948849, 25.4677106778), (41.0353176138, 25.5317343085), (41.0616006663, 25.6148229571))
            Line((41.0616006663, 25.6148229571), (41.0532365012, 25.518635059))
            ThreePointArc((41.0532365012, 25.518635059), (41.0144422362, 25.4935865713), (40.9761948849, 25.4677106778))
        make_face()
        with BuildLine():
            ThreePointArc((31.6332130872, 47.5198976568), (31.5371124385, 47.4813926831), (31.4731393222, 47.3999960733))
            Line((31.4731393222, 47.3999960733), (31.5196205494, 47.5086263571))
            ThreePointArc((31.5196205494, 47.5086263571), (31.5764742628, 47.5136830794), (31.6332130872, 47.5198976568))
        make_face()
        with BuildLine():
            ThreePointArc((32.5596264709, 47.7993318585), (32.6609901865, 47.8203880893), (32.7593018546, 47.7879414622))
            Line((32.7593018546, 47.7879414622), (32.6605057325, 47.8527517184))
            ThreePointArc((32.6605057325, 47.8527517184), (32.6103383575, 47.8255276544), (32.5596264709, 47.7993318585))
        make_face()
        with BuildLine():
            ThreePointArc((25.4095641662, 33.2289440234), (25.3984297346, 33.1058659826), (25.4617506654, 32.9997403993))
            ThreePointArc((25.4617506654, 32.9997403993), (25.406983061, 33.046907508), (25.3514889375, 33.0932176461))
            Line((25.3514889375, 33.0932176461), (25.4095641662, 33.2289440234))
        make_face()
        with BuildLine():
            ThreePointArc((25.4808983556, 32.9828961114), (25.5942298904, 32.9336199214), (25.7148845204, 32.9603526723))
            Line((25.7148845204, 32.9603526723), (25.5876684333, 32.8854497425))
            ThreePointArc((25.5876684333, 32.8854497425), (25.5346620784, 32.9345878435), (25.4808983556, 32.9828961114))
        make_face()
    extrude(amount=F5_T1_DEPTH)

    # F5_s4 → F5_t3 (cut)
    with BuildSketch(Plane.XY.offset(-3.0301904067)):
        with BuildLine():
            ThreePointArc((29.4692307692, 52.4185570617), (29.6832050294, 52.4491021791), (29.8, 52.2672315573))
            Line((29.8, 52.2672315573), (29.8, 52.6643180835))
            ThreePointArc((29.8, 52.6643180835), (29.6300881649, 52.5475307479), (29.4692307692, 52.4185570617))
        make_face()
        with BuildLine():
            ThreePointArc((32.8, 52.2672315573), (32.9167949706, 52.4491021791), (33.1307692308, 52.4185570617))
            ThreePointArc((33.1307692308, 52.4185570617), (32.9699118351, 52.5475307479), (32.8, 52.6643180835))
            Line((32.8, 52.6643180835), (32.8, 52.2672315573))
        make_face()
    extrude(amount=F5_T3_DEPTH, mode=Mode.SUBTRACT)


solid = f2.part
